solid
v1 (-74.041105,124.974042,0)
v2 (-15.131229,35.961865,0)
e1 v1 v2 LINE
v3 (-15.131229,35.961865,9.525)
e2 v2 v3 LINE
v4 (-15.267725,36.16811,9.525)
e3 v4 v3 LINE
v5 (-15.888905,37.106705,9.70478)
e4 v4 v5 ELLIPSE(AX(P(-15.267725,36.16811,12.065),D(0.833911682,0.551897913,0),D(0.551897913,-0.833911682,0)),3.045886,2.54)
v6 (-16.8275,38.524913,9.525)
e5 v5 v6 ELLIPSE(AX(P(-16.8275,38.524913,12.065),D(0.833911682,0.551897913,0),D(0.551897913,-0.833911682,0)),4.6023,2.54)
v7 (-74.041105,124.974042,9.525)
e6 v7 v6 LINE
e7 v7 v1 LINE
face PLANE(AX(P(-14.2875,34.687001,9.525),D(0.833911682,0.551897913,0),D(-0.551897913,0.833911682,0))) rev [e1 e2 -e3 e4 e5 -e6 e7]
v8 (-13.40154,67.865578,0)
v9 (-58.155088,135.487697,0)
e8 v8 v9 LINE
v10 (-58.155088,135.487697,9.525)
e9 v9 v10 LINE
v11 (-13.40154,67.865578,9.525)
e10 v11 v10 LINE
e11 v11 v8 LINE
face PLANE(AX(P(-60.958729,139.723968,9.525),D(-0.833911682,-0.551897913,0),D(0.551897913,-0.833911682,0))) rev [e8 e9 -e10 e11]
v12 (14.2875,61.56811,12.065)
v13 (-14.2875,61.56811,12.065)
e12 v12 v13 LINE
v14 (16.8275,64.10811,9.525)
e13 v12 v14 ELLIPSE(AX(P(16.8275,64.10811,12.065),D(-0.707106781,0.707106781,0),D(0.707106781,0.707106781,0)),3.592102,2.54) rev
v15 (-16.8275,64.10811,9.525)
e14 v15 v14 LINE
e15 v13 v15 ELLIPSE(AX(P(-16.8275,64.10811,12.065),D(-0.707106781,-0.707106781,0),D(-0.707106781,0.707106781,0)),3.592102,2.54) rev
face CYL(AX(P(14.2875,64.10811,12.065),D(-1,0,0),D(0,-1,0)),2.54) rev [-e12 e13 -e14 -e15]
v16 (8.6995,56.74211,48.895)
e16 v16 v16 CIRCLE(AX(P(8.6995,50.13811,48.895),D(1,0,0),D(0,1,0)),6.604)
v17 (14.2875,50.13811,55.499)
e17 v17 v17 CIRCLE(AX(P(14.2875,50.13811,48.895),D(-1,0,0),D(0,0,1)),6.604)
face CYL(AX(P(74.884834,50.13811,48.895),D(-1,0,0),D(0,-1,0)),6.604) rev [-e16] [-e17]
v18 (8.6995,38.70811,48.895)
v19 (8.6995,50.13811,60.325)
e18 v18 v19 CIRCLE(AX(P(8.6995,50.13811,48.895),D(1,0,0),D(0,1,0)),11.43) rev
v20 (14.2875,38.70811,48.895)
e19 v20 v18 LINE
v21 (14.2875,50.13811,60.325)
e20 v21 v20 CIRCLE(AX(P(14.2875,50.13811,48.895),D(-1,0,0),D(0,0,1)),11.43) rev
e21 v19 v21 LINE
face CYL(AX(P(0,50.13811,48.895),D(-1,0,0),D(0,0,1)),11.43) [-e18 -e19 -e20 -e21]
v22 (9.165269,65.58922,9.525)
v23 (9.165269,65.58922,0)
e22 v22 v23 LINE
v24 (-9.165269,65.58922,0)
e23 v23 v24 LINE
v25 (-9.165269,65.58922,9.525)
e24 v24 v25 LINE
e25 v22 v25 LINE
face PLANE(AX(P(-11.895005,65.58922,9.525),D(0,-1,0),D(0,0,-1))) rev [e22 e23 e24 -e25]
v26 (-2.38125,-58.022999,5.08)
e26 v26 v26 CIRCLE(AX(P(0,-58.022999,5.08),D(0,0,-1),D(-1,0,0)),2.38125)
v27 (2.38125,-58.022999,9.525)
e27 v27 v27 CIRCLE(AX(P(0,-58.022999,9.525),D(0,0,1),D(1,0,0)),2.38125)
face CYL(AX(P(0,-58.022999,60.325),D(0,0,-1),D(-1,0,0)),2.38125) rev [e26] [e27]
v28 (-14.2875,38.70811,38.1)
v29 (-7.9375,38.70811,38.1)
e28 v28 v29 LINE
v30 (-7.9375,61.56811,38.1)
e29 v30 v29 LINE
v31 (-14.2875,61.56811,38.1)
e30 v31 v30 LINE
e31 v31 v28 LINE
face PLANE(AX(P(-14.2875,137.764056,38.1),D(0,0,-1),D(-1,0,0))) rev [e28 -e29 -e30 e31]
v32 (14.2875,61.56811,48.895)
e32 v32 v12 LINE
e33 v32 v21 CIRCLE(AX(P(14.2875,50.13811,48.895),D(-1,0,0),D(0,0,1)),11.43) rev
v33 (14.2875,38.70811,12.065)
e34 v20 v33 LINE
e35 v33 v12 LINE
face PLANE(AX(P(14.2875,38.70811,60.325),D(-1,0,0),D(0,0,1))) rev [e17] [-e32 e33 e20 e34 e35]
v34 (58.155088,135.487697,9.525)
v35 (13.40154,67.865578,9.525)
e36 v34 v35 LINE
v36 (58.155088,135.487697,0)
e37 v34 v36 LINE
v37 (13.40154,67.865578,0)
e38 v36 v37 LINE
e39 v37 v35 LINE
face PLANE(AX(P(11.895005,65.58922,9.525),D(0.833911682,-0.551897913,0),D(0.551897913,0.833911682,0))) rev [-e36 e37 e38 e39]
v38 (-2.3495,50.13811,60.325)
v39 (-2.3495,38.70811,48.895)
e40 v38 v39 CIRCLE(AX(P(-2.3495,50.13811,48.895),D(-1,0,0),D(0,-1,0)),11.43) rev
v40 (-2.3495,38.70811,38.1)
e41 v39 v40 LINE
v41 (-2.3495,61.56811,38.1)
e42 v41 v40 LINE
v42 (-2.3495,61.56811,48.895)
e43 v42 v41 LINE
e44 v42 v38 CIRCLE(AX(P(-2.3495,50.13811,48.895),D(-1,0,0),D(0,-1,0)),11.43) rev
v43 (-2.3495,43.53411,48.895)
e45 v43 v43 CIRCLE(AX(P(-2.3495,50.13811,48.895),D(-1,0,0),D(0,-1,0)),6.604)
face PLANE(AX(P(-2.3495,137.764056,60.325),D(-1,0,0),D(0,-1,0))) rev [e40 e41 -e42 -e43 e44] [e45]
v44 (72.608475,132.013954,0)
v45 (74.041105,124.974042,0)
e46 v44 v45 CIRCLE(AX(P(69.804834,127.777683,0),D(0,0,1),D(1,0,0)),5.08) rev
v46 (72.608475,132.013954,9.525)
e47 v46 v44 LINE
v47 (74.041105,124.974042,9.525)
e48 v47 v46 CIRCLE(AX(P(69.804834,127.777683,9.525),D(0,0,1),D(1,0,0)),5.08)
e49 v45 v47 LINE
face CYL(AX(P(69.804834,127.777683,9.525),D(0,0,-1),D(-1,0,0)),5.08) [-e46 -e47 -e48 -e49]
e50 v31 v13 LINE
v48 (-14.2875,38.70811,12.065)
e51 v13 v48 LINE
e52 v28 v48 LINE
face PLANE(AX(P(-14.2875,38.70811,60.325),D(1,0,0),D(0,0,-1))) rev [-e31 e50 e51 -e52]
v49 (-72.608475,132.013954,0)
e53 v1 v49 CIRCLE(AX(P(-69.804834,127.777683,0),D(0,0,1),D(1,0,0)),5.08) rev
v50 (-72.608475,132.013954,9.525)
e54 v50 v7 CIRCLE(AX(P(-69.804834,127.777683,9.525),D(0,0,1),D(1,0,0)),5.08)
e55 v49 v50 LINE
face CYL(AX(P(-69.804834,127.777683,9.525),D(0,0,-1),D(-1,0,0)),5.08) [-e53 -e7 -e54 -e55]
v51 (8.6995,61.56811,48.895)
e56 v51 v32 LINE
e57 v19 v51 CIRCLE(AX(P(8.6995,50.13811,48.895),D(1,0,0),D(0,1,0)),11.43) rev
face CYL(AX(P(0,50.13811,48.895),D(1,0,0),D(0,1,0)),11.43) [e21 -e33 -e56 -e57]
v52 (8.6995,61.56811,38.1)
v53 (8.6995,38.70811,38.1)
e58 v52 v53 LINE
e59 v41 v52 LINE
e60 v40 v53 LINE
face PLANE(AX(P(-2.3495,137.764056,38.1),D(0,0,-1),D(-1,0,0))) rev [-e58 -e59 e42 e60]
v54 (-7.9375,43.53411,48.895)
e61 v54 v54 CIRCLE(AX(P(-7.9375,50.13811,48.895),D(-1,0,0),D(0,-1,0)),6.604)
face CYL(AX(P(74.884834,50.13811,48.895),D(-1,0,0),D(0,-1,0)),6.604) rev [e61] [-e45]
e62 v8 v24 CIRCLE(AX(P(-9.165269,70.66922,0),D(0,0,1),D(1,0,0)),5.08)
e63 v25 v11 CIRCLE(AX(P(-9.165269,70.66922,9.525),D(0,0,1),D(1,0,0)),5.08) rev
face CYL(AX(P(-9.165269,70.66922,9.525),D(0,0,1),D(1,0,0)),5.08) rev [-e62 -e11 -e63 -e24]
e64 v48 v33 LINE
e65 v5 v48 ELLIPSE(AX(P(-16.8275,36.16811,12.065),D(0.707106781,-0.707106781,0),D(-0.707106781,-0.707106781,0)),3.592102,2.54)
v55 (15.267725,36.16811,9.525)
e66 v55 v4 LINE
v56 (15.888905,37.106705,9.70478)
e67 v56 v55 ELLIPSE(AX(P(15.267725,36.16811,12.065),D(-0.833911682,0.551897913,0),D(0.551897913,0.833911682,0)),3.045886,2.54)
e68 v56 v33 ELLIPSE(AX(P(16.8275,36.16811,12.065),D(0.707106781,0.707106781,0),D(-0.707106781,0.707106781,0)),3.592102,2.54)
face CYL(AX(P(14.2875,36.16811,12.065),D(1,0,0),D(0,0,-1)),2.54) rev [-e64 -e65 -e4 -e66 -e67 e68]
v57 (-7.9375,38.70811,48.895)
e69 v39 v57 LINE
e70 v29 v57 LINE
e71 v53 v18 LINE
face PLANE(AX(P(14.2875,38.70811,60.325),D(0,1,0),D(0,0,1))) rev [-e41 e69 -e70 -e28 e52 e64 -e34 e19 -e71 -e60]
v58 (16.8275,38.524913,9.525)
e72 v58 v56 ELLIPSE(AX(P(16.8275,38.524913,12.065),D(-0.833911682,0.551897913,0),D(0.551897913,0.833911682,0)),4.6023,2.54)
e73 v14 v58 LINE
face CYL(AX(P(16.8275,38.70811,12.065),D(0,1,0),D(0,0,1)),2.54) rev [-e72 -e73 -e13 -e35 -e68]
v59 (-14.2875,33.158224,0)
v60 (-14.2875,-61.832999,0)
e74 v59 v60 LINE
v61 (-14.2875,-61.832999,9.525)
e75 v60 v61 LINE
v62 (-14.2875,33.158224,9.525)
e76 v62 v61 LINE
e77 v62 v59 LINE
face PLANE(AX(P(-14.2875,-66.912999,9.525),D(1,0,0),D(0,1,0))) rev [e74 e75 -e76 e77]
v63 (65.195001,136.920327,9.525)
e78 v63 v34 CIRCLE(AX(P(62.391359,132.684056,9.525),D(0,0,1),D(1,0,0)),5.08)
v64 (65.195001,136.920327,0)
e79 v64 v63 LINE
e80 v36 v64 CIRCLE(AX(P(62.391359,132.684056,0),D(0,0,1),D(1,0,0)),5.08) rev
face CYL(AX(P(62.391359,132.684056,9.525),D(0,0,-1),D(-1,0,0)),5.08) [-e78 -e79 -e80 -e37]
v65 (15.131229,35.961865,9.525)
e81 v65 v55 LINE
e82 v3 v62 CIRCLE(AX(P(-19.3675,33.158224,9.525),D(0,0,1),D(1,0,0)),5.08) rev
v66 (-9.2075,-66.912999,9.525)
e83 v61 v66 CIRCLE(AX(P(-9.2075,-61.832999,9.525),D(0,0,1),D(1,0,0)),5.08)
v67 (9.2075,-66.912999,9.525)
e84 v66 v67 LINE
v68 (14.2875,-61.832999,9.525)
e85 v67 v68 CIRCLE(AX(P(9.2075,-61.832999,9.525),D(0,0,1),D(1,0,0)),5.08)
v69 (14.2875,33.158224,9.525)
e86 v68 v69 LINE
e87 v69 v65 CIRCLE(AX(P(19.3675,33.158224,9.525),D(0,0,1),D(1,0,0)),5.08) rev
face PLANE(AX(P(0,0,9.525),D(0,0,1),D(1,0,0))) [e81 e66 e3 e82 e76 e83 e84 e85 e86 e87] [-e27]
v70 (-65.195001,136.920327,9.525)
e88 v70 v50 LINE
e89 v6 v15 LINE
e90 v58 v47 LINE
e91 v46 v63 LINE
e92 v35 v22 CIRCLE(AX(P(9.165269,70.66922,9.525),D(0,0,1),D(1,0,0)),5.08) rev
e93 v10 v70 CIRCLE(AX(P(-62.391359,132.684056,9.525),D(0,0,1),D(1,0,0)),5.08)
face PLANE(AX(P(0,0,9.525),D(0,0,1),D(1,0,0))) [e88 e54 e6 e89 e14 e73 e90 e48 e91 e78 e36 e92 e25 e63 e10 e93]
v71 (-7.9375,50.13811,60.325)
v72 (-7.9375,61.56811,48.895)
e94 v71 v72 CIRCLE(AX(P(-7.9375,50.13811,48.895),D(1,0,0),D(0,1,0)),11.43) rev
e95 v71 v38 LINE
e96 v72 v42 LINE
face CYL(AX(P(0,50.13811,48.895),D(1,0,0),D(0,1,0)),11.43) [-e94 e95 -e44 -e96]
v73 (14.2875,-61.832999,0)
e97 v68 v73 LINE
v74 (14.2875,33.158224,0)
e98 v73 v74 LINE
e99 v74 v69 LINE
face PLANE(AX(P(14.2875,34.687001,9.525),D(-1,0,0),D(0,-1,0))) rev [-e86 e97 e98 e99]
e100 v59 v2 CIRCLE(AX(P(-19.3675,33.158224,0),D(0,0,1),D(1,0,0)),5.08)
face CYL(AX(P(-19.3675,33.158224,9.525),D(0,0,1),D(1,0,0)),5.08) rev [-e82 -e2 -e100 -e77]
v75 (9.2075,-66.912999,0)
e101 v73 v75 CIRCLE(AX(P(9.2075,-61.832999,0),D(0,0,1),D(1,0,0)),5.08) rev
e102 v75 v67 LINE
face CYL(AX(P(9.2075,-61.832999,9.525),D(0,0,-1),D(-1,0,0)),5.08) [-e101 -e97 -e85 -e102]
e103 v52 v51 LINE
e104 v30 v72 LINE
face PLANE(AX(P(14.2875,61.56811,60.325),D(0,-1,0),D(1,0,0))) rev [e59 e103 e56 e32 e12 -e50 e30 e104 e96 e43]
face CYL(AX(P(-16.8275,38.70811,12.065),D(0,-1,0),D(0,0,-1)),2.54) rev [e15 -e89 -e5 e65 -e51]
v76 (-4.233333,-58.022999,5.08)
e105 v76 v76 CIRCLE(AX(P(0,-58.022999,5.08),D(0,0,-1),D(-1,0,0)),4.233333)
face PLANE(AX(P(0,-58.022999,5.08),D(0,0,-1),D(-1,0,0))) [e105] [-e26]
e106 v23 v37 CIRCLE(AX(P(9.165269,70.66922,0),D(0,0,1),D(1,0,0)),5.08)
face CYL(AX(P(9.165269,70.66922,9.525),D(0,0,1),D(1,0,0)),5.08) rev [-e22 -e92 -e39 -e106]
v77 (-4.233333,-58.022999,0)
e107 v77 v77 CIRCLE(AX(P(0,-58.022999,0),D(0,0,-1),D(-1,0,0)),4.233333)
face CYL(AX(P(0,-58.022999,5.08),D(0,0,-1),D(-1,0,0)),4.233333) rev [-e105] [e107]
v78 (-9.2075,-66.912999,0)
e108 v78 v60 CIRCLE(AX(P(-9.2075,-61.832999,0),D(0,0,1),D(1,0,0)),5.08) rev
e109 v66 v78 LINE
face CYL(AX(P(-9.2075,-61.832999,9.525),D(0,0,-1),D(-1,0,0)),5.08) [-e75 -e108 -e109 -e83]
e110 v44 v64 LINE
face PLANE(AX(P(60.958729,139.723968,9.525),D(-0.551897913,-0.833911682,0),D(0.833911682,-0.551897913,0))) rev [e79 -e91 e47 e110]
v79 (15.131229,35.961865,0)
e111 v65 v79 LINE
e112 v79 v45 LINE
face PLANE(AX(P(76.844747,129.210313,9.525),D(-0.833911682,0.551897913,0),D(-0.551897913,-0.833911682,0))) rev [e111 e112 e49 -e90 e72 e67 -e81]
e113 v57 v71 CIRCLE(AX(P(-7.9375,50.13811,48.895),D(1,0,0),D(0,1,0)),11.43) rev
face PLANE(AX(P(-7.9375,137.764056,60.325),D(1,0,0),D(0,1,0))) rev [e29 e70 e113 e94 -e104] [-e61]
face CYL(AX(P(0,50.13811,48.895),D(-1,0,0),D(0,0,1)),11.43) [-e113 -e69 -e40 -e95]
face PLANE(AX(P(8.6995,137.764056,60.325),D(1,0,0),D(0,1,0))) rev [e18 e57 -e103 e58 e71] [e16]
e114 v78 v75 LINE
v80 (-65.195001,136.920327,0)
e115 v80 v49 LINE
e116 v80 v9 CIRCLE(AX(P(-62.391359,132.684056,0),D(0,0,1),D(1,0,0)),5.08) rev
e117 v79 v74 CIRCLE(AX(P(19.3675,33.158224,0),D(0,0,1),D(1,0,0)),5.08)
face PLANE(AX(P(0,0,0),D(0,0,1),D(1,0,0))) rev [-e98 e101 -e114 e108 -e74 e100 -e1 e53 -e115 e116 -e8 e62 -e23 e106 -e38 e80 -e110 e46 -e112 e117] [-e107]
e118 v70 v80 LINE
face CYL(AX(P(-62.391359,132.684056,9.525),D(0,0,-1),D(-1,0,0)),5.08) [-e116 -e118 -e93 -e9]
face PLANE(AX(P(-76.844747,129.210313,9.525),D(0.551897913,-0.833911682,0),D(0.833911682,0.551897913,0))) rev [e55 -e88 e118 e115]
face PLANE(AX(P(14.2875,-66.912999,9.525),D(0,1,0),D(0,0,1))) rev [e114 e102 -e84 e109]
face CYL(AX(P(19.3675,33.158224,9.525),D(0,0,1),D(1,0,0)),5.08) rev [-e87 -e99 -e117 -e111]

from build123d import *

# Parameters (mm, degrees)
BOSS_EXTRUDE1_DEPTH = 9.525
SKETCH3_W           = 28.575
SKETCH3_H           = 22.86
BOSS_EXTRUDE2_DEPTH = 50.8
FILLET1_R           = 5.08
SKETCH4_W           = 6.35
SKETCH4_H           = 22.225
SKETCH4_W_2         = 11.049
CUT_EXTRUDE1_DEPTH  = 143.837889922
FILLET3_R           = 11.43
SKETCH5_R           = 6.604
CUT_EXTRUDE2_DEPTH  = 172.690359797
SKETCH7_R           = 4.233333333
CUT_EXTRUDE3_DEPTH  = 5.08
SKETCH8_R           = 2.38125
CUT_EXTRUDE4_DEPTH  = 167.248859845
FILLET7_R           = 2.54


# Some blends are built 0.0001 mm under size
with BuildPart() as part:
    # Sketch1 → Boss-Extrude1 (new body)
    with BuildSketch(Plane.XY):
        Polygon((-11.895004803, 65.589219752), (11.895004803, 65.589219752), (60.958729286, 139.723968283), (76.844746829, 129.210313037), (14.2875, 34.687000521), (14.2875, -66.912999479), (-14.2875, -66.912999479), (-14.2875, 34.687000521), (-76.844746829, 129.210313037), (-60.958729286, 139.723968283), align=None)
    extrude(amount=BOSS_EXTRUDE1_DEPTH)

    # Sketch3 → Boss-Extrude2 (add)
    with BuildSketch(Plane.XY.offset(9.525)):
        with Locations((0, 50.138110136)):
            Rectangle(SKETCH3_W, SKETCH3_H)
    extrude(amount=BOSS_EXTRUDE2_DEPTH)

    # Fillet1
    fillet1_edges = [part.edges().sort_by_distance(p)[0] for p in [
        (-11.895004803, 65.589219752, 4.7625),
        (11.895004803, 65.589219752, 4.7625),
        (60.958729286, 139.723968283, 4.7625),
        (76.844746829, 129.210313037, 4.7625),
        (14.2875, 34.687000521, 4.7625),
        (14.2875, -66.912999479, 4.7625),
        (-14.2875, -66.912999479, 4.7625),
        (-14.2875, 34.687000521, 4.7625),
        (-76.844746829, 129.210313037, 4.7625),
        (-60.958729286, 139.723968283, 4.7625),
    ]]
    fillet(fillet1_edges, radius=FILLET1_R)

    # Sketch4 → Cut-Extrude1 (cut, through all)
    with BuildSketch(Plane.XZ.offset(-38.708110136)):
        with Locations((-11.1125, 49.2125)):
            Rectangle(SKETCH4_W, SKETCH4_H)
        with Locations((3.175, 49.2125)):
            Rectangle(SKETCH4_W_2, SKETCH4_H)
    extrude(amount=-CUT_EXTRUDE1_DEPTH, mode=Mode.SUBTRACT)

    # Fillet3
    fillet3_edges = [part.edges().sort_by_distance(p)[0] for p in [
        (11.4935, 61.568110136, 60.325),
        (-5.1435, 61.568110136, 60.325),
        (11.4935, 38.708110136, 60.325),
        (-5.1435, 38.708110136, 60.325),
    ]]
    fillet(fillet3_edges, radius=FILLET3_R - 0.0001)  # a hair under: the kernel refuses the full size

    # Sketch5 → Cut-Extrude2 (cut, through all)
    with BuildSketch(Plane.ZY.offset(7.9375)):
        with Locations(Location((48.895, 50.138110136, 0), (0, 0, 270))):
            Circle(SKETCH5_R)
    extrude(amount=-CUT_EXTRUDE2_DEPTH, mode=Mode.SUBTRACT)

    # Sketch7 → Cut-Extrude3 (cut)
    with BuildSketch(Plane(origin=(0, 0, 0), x_dir=(-1, 0, 0), z_dir=(0, 0, -1))):
        with Locations((0, -58.022999479)):
            Circle(SKETCH7_R)
    extrude(amount=-CUT_EXTRUDE3_DEPTH, mode=Mode.SUBTRACT)

    # Sketch8 → Cut-Extrude4 (cut, through all)
    with BuildSketch(Plane(origin=(0, 0, 5.08), x_dir=(-1, 0, 0), z_dir=(0, 0, -1))):
        with Locations((0, -58.022999479)):
            Circle(SKETCH8_R)
    extrude(amount=-CUT_EXTRUDE4_DEPTH, mode=Mode.SUBTRACT)

    # Fillet7
    # the kernel refuses this fillet: 2.54 mm, written as the material it adds along each edge
    with BuildSketch(Plane(origin=(-14.2875, 38.708110136, 9.525), x_dir=(0, 0, 1), z_dir=(0, 1, 0))) as fillet7_piece_1:
        with BuildLine():
            CenterArc((FILLET7_R, -FILLET7_R), FILLET7_R, 90, 90)
            Line((0, -FILLET7_R), (0, 0))
            Line((0, 0), (FILLET7_R, 0))
        make_face()
    extrude(amount=22.86)
    with BuildSketch(Plane(origin=(14.2875, 38.708110136, 9.525), x_dir=(0, 0, 1), z_dir=(-1, 0, 0))) as fillet7_piece_2:
        with BuildLine():
            CenterArc((FILLET7_R, -FILLET7_R), FILLET7_R, 90, 90)
            Line((0, -FILLET7_R), (0, 0))
            Line((0, 0), (FILLET7_R, 0))
        make_face()
    extrude(amount=28.575)
    with BuildSketch(Plane(origin=(14.2875, 61.568110136, 9.525), x_dir=(1, 0, 0), z_dir=(0, -1, 0))) as fillet7_piece_3:
        with BuildLine():
            CenterArc((FILLET7_R, FILLET7_R), FILLET7_R, 180, 90)
            Line((0, FILLET7_R), (0, 0))
            Line((0, 0), (FILLET7_R, 0))
        make_face()
    extrude(amount=22.86)
    with BuildSketch(Plane(origin=(-14.2875, 61.568110136, 9.525), x_dir=(0, 1, 0), z_dir=(1, 0, 0))) as fillet7_piece_4:
        with BuildLine():
            CenterArc((FILLET7_R, FILLET7_R), FILLET7_R, 180, 90)
            Line((0, FILLET7_R), (0, 0))
            Line((0, 0), (FILLET7_R, 0))
        make_face()
    extrude(amount=28.575)
    with BuildSketch(Plane(origin=(14.2875, 38.708110136, 9.525), x_dir=(0, 0, 1), z_dir=(-1, 0, 0))) as fillet7_piece_5a_section:
        with BuildLine():
            CenterArc((FILLET7_R, -FILLET7_R), FILLET7_R, 90, 90)
            Line((0, -FILLET7_R), (0, 0))
            Line((0, 0), (FILLET7_R, 0))
        make_face()
    fillet7_piece_5a = extrude(amount=34.925, mode=Mode.PRIVATE)
    fillet7_piece_5a = split(fillet7_piece_5a, bisect_by=Plane(origin=(-14.2875, 38.220078421, 10.151447049), z_dir=(-1, 0, 0)), keep=Keep.TOP, mode=Mode.PRIVATE)
    fillet7_piece_5a = split(fillet7_piece_5a, bisect_by=Plane(origin=(-16.26964909, 37.682006014, 10.151447049), z_dir=(0.8339116820223069, 0.5518979131929445, 0)), keep=Keep.TOP, mode=Mode.PRIVATE)
    with BuildSketch(Plane(origin=(-14.2875, 32.358110136, 9.525), x_dir=(0, 0, 1), z_dir=(0, 1, 0))) as fillet7_piece_5b_section:
        with BuildLine():
            CenterArc((FILLET7_R, -FILLET7_R), FILLET7_R, 90, 90)
            Line((0, -FILLET7_R), (0, 0))
            Line((0, 0), (FILLET7_R, 0))
        make_face()
    fillet7_piece_5b = extrude(amount=29.21, mode=Mode.PRIVATE)
    fillet7_piece_5b = split(fillet7_piece_5b, bisect_by=Plane(origin=(-14.718813993, 38.708110136, 10.184953821), z_dir=(0, -1, 0)), keep=Keep.TOP, mode=Mode.PRIVATE)
    fillet7_piece_5b = split(fillet7_piece_5b, bisect_by=Plane(origin=(-15.49417016, 36.510265873, 10.184953821), z_dir=(0.8339116820223069, 0.5518979131929445, 0)), keep=Keep.TOP, mode=Mode.PRIVATE)
    fillet7_piece_5 = fillet7_piece_5a & fillet7_piece_5b
    add(fillet7_piece_5)
    with BuildSketch(Plane(origin=(-14.2875, 38.708110136, 9.525), x_dir=(0, 0, 1), z_dir=(0, 1, 0))) as fillet7_piece_6a_section:
        with BuildLine():
            CenterArc((FILLET7_R, -FILLET7_R), FILLET7_R, 90, 90)
            Line((0, -FILLET7_R), (0, 0))
            Line((0, 0), (FILLET7_R, 0))
        make_face()
    fillet7_piece_6a = extrude(amount=29.21, mode=Mode.PRIVATE)
    fillet7_piece_6a = split(fillet7_piece_6a, bisect_by=Plane(origin=(-14.86254359, 61.568110136, 10.10004359), z_dir=(0, 1, 0)), keep=Keep.TOP, mode=Mode.PRIVATE)
    with BuildSketch(Plane(origin=(-20.6375, 61.568110136, 9.525), x_dir=(0, 1, 0), z_dir=(1, 0, 0))) as fillet7_piece_6b_section:
        with BuildLine():
            CenterArc((FILLET7_R, FILLET7_R), FILLET7_R, 180, 90)
            Line((0, FILLET7_R), (0, 0))
            Line((0, 0), (FILLET7_R, 0))
        make_face()
    fillet7_piece_6b = extrude(amount=34.925, mode=Mode.PRIVATE)
    fillet7_piece_6b = split(fillet7_piece_6b, bisect_by=Plane(origin=(-14.2875, 62.143153727, 10.10004359), z_dir=(-1, 0, 0)), keep=Keep.TOP, mode=Mode.PRIVATE)
    fillet7_piece_6 = fillet7_piece_6a & fillet7_piece_6b
    add(fillet7_piece_6)
    with BuildSketch(Plane(origin=(20.6375, 38.708110136, 9.525), x_dir=(0, 0, 1), z_dir=(-1, 0, 0))) as fillet7_piece_7a_section:
        with BuildLine():
            CenterArc((FILLET7_R, -FILLET7_R), FILLET7_R, 90, 90)
            Line((0, -FILLET7_R), (0, 0))
            Line((0, 0), (FILLET7_R, 0))
        make_face()
    fillet7_piece_7a = extrude(amount=34.925, mode=Mode.PRIVATE)
    fillet7_piece_7a = split(fillet7_piece_7a, bisect_by=Plane(origin=(14.2875, 38.220078421, 10.151447049), z_dir=(1, 0, 0)), keep=Keep.TOP, mode=Mode.PRIVATE)
    fillet7_piece_7a = split(fillet7_piece_7a, bisect_by=Plane(origin=(16.26964909, 37.682006014, 10.151447049), z_dir=(-0.8339116820223068, 0.5518979131929448, 0)), keep=Keep.TOP, mode=Mode.PRIVATE)
    with BuildSketch(Plane(origin=(14.2875, 61.568110136, 9.525), x_dir=(1, 0, 0), z_dir=(0, -1, 0))) as fillet7_piece_7b_section:
        with BuildLine():
            CenterArc((FILLET7_R, FILLET7_R), FILLET7_R, 180, 90)
            Line((0, FILLET7_R), (0, 0))
            Line((0, 0), (FILLET7_R, 0))
        make_face()
    fillet7_piece_7b = extrude(amount=29.21, mode=Mode.PRIVATE)
    fillet7_piece_7b = split(fillet7_piece_7b, bisect_by=Plane(origin=(14.718813993, 38.708110136, 10.184953821), z_dir=(0, -1, 0)), keep=Keep.TOP, mode=Mode.PRIVATE)
    fillet7_piece_7b = split(fillet7_piece_7b, bisect_by=Plane(origin=(15.49417016, 36.510265872, 10.184953821), z_dir=(-0.8339116820223068, 0.5518979131929448, 0)), keep=Keep.TOP, mode=Mode.PRIVATE)
    fillet7_piece_7 = fillet7_piece_7a & fillet7_piece_7b
    add(fillet7_piece_7)
    with BuildSketch(Plane(origin=(14.2875, 67.918110136, 9.525), x_dir=(1, 0, 0), z_dir=(0, -1, 0))) as fillet7_piece_8a_section:
        with BuildLine():
            CenterArc((FILLET7_R, FILLET7_R), FILLET7_R, 180, 90)
            Line((0, FILLET7_R), (0, 0))
            Line((0, 0), (FILLET7_R, 0))
        make_face()
    fillet7_piece_8a = extrude(amount=29.21, mode=Mode.PRIVATE)
    fillet7_piece_8a = split(fillet7_piece_8a, bisect_by=Plane(origin=(14.86254359, 61.568110136, 10.10004359), z_dir=(0, 1, 0)), keep=Keep.TOP, mode=Mode.PRIVATE)
    with BuildSketch(Plane(origin=(-14.2875, 61.568110136, 9.525), x_dir=(0, 1, 0), z_dir=(1, 0, 0))) as fillet7_piece_8b_section:
        with BuildLine():
            CenterArc((FILLET7_R, FILLET7_R), FILLET7_R, 180, 90)
            Line((0, FILLET7_R), (0, 0))
            Line((0, 0), (FILLET7_R, 0))
        make_face()
    fillet7_piece_8b = extrude(amount=34.925, mode=Mode.PRIVATE)
    fillet7_piece_8b = split(fillet7_piece_8b, bisect_by=Plane(origin=(14.2875, 62.143153727, 10.10004359), z_dir=(1, 0, 0)), keep=Keep.TOP, mode=Mode.PRIVATE)
    fillet7_piece_8 = fillet7_piece_8a & fillet7_piece_8b
    add(fillet7_piece_8)


solid = part.part
